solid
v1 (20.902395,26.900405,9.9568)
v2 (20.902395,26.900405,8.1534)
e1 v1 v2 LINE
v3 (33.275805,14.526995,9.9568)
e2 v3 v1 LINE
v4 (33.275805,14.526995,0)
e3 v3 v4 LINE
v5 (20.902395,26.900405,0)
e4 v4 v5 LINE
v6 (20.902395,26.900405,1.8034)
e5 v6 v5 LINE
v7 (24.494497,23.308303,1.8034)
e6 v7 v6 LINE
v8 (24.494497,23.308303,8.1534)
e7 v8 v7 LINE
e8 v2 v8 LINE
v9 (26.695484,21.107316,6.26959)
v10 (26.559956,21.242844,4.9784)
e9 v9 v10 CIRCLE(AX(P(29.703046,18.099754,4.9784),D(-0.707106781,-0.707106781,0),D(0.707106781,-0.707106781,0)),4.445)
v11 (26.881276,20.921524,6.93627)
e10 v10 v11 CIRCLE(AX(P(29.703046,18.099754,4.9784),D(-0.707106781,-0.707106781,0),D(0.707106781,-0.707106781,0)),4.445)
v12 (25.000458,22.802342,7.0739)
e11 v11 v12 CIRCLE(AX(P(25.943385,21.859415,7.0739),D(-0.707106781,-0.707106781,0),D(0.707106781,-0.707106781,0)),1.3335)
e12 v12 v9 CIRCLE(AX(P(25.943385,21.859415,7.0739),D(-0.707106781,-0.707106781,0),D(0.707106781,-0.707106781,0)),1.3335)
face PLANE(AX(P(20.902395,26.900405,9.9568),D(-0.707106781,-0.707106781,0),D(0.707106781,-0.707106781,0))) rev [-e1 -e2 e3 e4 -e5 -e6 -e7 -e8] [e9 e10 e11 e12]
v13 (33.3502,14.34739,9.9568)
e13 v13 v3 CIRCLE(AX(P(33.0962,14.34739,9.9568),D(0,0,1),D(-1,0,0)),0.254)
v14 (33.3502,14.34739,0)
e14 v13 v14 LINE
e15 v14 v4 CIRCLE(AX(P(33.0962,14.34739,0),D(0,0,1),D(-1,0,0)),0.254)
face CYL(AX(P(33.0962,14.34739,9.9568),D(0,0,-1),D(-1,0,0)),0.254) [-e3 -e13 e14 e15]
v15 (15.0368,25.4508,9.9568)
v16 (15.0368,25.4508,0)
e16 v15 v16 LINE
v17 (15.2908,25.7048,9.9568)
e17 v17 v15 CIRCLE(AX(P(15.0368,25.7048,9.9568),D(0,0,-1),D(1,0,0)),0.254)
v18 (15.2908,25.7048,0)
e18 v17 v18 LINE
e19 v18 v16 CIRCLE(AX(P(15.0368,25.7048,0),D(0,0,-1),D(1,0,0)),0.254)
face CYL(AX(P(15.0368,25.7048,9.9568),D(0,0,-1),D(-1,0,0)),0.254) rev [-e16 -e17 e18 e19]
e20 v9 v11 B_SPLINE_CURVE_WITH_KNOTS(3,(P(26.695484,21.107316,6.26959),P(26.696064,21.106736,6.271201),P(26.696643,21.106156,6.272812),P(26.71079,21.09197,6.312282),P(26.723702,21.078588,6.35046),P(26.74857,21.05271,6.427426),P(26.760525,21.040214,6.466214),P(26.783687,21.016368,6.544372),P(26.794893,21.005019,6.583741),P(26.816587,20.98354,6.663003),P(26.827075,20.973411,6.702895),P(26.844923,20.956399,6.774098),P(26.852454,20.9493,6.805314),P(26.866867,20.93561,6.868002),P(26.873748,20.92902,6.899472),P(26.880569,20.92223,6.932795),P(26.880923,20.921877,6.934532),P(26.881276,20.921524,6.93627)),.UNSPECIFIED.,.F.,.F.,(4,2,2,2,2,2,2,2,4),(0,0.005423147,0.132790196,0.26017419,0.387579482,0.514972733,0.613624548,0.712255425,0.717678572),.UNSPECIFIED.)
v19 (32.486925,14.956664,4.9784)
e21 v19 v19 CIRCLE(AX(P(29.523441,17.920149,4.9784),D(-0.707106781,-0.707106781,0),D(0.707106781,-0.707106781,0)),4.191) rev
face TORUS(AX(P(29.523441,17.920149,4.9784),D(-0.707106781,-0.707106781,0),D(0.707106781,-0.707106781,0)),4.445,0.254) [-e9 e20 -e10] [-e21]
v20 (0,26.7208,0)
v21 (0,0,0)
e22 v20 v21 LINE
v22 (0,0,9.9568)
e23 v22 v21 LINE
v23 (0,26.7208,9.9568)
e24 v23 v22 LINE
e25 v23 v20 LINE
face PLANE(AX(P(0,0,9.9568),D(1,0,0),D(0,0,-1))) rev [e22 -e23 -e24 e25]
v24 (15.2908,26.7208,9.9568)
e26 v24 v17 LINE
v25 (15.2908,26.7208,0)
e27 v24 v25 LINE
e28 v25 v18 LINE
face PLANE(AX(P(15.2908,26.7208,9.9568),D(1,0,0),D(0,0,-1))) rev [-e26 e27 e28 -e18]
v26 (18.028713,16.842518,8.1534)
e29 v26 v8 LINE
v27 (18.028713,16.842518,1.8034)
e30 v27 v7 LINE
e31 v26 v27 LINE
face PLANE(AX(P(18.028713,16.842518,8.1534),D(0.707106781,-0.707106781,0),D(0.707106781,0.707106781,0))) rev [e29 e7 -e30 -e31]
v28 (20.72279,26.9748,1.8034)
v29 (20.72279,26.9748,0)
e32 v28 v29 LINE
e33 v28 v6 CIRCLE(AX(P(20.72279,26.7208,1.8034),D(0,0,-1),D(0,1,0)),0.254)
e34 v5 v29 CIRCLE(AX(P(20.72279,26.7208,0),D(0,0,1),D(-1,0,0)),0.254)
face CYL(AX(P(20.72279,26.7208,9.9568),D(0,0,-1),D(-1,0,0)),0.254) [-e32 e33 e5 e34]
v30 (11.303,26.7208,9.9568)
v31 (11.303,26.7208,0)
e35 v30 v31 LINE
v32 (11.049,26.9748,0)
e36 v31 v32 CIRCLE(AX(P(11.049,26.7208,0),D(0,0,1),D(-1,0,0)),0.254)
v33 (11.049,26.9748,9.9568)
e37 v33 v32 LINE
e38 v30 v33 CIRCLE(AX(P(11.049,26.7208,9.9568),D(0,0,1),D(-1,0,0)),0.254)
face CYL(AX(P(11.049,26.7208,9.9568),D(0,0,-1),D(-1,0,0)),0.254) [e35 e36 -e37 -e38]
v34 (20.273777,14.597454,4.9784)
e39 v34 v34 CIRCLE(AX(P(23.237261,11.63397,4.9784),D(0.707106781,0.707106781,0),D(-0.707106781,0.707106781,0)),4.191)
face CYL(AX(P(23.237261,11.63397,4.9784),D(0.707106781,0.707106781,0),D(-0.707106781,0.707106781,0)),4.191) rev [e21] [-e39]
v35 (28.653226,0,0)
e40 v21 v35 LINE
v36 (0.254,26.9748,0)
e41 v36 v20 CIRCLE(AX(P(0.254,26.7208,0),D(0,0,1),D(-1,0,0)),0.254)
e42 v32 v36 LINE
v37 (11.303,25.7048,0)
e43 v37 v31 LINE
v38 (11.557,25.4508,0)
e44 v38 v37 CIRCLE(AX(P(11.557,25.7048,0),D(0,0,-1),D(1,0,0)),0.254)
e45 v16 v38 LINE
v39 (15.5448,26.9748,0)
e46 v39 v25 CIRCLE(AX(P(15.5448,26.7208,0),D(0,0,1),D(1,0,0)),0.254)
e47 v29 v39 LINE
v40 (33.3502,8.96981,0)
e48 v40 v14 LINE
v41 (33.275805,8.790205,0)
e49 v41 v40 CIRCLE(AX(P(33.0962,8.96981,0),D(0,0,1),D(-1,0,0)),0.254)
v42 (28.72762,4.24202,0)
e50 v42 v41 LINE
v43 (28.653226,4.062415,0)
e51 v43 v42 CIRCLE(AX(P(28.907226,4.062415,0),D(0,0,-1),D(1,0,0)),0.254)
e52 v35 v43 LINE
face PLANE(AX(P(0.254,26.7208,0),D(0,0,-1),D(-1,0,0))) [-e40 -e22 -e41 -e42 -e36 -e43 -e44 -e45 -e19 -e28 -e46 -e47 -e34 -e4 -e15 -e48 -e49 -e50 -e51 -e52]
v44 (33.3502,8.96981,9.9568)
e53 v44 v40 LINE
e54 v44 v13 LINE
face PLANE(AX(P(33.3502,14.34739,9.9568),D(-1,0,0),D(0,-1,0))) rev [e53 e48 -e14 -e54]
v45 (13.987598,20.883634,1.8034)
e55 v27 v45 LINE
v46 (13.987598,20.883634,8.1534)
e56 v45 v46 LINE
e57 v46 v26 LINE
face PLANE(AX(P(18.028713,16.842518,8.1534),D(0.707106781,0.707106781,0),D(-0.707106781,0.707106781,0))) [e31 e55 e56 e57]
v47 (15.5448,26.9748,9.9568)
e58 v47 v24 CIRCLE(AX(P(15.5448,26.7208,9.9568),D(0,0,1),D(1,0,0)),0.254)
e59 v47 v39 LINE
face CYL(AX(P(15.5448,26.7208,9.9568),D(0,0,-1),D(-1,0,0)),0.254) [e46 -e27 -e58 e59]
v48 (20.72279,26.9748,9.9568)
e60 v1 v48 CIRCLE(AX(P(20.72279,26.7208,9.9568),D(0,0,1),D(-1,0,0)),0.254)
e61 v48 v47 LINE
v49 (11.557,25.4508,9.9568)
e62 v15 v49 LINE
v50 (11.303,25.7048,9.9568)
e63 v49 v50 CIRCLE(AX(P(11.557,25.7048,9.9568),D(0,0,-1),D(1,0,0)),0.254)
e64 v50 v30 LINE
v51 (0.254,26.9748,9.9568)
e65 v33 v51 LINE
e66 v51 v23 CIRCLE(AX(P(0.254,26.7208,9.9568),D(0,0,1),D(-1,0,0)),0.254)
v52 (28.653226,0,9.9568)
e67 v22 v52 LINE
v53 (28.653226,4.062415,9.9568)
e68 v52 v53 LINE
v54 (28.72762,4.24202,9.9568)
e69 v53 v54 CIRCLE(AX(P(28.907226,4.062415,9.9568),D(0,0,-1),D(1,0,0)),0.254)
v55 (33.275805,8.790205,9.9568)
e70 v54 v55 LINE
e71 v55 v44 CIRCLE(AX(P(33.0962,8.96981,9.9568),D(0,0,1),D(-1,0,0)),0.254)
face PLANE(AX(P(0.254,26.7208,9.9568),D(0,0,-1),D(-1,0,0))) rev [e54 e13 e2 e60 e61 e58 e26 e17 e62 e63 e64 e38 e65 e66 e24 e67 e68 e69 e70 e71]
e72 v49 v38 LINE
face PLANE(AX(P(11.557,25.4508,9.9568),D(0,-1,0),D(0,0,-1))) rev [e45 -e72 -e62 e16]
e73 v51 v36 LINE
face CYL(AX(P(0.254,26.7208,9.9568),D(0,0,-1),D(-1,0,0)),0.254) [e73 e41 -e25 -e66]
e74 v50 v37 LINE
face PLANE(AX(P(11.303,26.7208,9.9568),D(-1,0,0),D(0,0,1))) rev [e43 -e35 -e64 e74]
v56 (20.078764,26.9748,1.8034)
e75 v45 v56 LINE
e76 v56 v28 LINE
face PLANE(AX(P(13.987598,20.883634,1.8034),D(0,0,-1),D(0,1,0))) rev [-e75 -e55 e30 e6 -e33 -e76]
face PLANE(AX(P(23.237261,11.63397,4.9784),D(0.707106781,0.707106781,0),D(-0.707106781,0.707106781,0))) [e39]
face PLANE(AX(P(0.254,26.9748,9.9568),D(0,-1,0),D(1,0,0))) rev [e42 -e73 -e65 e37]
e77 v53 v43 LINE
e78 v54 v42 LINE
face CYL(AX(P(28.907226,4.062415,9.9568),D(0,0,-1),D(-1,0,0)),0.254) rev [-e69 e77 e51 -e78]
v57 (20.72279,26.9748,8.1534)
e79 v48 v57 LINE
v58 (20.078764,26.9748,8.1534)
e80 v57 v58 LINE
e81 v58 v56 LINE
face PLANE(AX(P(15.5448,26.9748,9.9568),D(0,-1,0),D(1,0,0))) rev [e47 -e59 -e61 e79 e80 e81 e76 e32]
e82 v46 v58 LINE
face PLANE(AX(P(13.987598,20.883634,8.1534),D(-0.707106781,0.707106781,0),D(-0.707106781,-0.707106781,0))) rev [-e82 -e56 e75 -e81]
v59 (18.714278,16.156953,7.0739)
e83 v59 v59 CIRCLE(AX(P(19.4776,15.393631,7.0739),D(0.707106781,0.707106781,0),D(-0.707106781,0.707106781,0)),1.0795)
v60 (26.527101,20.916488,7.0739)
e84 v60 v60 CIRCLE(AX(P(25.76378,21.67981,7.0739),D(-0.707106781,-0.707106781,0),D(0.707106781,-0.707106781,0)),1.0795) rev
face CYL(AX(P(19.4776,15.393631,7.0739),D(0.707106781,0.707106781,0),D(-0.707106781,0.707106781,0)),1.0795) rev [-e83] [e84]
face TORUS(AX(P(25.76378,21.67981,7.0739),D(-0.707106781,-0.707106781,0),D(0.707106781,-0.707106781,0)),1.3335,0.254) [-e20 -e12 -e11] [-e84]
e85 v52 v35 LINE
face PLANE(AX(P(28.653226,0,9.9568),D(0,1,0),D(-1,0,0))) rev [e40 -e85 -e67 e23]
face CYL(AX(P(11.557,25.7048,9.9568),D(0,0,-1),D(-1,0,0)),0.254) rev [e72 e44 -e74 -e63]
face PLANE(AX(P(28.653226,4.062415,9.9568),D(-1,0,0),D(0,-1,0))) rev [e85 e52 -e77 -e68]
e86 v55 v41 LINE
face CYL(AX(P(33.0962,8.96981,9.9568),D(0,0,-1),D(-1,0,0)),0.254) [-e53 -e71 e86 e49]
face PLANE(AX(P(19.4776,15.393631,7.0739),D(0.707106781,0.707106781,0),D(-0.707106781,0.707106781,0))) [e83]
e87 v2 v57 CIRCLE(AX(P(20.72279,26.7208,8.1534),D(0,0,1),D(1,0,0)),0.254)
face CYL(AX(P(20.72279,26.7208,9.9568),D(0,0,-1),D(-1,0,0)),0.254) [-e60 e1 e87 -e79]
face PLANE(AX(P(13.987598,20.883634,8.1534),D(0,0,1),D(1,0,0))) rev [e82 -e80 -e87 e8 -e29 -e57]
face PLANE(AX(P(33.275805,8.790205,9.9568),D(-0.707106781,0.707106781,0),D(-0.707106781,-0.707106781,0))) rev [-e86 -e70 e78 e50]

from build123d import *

# Parameters (mm, degrees)
EXTRUDE1_DEPTH = 9.9568
SKETCH2_R      = 4.191000000000001
SKETCH2_R_2    = 1.079499999999997
EXTRUDE2_DEPTH = 9.144
FILLET1_R      = 0.254


with BuildPart() as part:
    # Sketch1 → Extrude1 (new body)
    with BuildSketch(Plane.XY):
        with BuildLine():
            Line((0, 0), (0, 26.720799999999993))
            ThreePointArc((0, 26.720799999999993), (0.07439487757861757, 26.900405122421375), (0.2540000000000018, 26.974799999999995))
            Line((0.2540000000000018, 26.974799999999995), (11.048999999999998, 26.9748))
            ThreePointArc((11.048999999999998, 26.9748), (11.228605122421383, 26.900405122421382), (11.303, 26.720799999999997))
            Line((11.303, 26.720799999999997), (11.303, 25.704799999999995))
            ThreePointArc((11.303, 25.704799999999995), (11.377394877578618, 25.52519487757861), (11.557000000000002, 25.450799999999994))
            Line((11.557000000000002, 25.450799999999994), (15.036799999999998, 25.450799999999994))
            ThreePointArc((15.036799999999998, 25.450799999999994), (15.216405122421383, 25.52519487757861), (15.2908, 25.704799999999995))
            Line((15.2908, 25.704799999999995), (15.2908, 26.720799999999997))
            ThreePointArc((15.2908, 26.720799999999997), (15.365194877578617, 26.900405122421382), (15.5448, 26.9748))
            Line((15.5448, 26.9748), (20.72278975515723, 26.974800000000002))
            ThreePointArc((20.72278975515723, 26.974800000000002), (20.819991346977968, 26.955465401257868), (20.902394877578615, 26.90040512242138))
            Line((20.902394877578615, 26.90040512242138), (33.275805122421374, 14.52699487757856))
            ThreePointArc((33.275805122421374, 14.52699487757856), (33.33086540125785, 14.444591346977912), (33.350199999999994, 14.347389755157183))
            Line((33.350199999999994, 14.347389755157183), (33.35019999999999, 8.969810244842721))
            ThreePointArc((33.35019999999999, 8.969810244842721), (33.33086540125785, 8.872608653021988), (33.275805122421374, 8.790205122421336))
            Line((33.275805122421374, 8.790205122421336), (28.72762045926646, 4.242020459266578))
            ThreePointArc((28.72762045926646, 4.242020459266578), (28.67256018042997, 4.159616928665926), (28.653225581687842, 4.0624153368451905))
            Line((28.653225581687842, 4.0624153368451905), (28.653225581687938, 4.34e-15))
            Line((28.653225581687938, 4.34e-15), (0, 0))
        make_face()
    extrude(amount=EXTRUDE1_DEPTH)

    # Sketch2 → Extrude2 (cut)
    with BuildSketch(Plane(origin=(23.90140000000005, 23.90139999999994, 0), x_dir=(0, 0, -1), z_dir=(0.7071067811865491, 0.707106781186546, 0))):
        with Locations(Location((-4.978399999999999, -8.204766282245217, 0), (0, 0, 90))):
            Circle(SKETCH2_R)
        with Locations(Location((-7.073900000000001, -2.887802416466178, 0), (0, 0, 90))):
            Circle(SKETCH2_R_2)
        Polygon((-8.153400000000001, 4.876233717754782), (-1.8034000000000028, 4.876233717754782), (-1.803400000000002, -0.838766282245218), (-8.153400000000001, -0.838766282245218), align=None)
    extrude(amount=-EXTRUDE2_DEPTH, mode=Mode.SUBTRACT)

    # Fillet1
    # the kernel refuses this fillet: 0.254 mm, written as the material it takes off along each edge
    with BuildSketch(Plane(origin=(29.70304587622637, 18.099754123773593, 4.978399999999999), x_dir=(-0.7071067811865458, 0.7071067811865491, 0), z_dir=(0, 0, -1))) as fillet1_piece_1:
        with BuildLine():
            CenterArc((4.191000000000001 + FILLET1_R, -FILLET1_R), FILLET1_R, 89.99999999999982, 89.9999999999984)
            Line((4.190999999999995, -FILLET1_R), (4.191000000000001, 1e-16))
            Line((4.191000000000001, 1e-16), (4.191000000000001 + FILLET1_R, -8.03e-15))
        make_face()
    revolve(axis=Axis((29.70304587622637, 18.099754123773593, 4.978399999999999), (0.7071067811865491, 0.707106781186546, 0)), mode=Mode.SUBTRACT)
    with BuildSketch(Plane(origin=(25.94338467141018, 21.8594153285898, 7.073900000000001), x_dir=(-0.7071067811865476, 0.7071067811865476, 0), z_dir=(0, 0, -1.0000000000000002))) as fillet1_piece_2:
        with BuildLine():
            CenterArc((1.079499999999997 + FILLET1_R, -FILLET1_R), FILLET1_R, 90, 89.99999999999832)
            Line((1.0794999999999895, -FILLET1_R), (1.079499999999997, -3e-17))
            Line((1.079499999999997, -3e-17), (1.079499999999997 + FILLET1_R, -5.05e-15))
        make_face()
    revolve(axis=Axis((25.94338467141018, 21.8594153285898, 7.073900000000001), (0.7071067811865491, 0.707106781186546, 0)), mode=Mode.SUBTRACT)


solid = part.part
